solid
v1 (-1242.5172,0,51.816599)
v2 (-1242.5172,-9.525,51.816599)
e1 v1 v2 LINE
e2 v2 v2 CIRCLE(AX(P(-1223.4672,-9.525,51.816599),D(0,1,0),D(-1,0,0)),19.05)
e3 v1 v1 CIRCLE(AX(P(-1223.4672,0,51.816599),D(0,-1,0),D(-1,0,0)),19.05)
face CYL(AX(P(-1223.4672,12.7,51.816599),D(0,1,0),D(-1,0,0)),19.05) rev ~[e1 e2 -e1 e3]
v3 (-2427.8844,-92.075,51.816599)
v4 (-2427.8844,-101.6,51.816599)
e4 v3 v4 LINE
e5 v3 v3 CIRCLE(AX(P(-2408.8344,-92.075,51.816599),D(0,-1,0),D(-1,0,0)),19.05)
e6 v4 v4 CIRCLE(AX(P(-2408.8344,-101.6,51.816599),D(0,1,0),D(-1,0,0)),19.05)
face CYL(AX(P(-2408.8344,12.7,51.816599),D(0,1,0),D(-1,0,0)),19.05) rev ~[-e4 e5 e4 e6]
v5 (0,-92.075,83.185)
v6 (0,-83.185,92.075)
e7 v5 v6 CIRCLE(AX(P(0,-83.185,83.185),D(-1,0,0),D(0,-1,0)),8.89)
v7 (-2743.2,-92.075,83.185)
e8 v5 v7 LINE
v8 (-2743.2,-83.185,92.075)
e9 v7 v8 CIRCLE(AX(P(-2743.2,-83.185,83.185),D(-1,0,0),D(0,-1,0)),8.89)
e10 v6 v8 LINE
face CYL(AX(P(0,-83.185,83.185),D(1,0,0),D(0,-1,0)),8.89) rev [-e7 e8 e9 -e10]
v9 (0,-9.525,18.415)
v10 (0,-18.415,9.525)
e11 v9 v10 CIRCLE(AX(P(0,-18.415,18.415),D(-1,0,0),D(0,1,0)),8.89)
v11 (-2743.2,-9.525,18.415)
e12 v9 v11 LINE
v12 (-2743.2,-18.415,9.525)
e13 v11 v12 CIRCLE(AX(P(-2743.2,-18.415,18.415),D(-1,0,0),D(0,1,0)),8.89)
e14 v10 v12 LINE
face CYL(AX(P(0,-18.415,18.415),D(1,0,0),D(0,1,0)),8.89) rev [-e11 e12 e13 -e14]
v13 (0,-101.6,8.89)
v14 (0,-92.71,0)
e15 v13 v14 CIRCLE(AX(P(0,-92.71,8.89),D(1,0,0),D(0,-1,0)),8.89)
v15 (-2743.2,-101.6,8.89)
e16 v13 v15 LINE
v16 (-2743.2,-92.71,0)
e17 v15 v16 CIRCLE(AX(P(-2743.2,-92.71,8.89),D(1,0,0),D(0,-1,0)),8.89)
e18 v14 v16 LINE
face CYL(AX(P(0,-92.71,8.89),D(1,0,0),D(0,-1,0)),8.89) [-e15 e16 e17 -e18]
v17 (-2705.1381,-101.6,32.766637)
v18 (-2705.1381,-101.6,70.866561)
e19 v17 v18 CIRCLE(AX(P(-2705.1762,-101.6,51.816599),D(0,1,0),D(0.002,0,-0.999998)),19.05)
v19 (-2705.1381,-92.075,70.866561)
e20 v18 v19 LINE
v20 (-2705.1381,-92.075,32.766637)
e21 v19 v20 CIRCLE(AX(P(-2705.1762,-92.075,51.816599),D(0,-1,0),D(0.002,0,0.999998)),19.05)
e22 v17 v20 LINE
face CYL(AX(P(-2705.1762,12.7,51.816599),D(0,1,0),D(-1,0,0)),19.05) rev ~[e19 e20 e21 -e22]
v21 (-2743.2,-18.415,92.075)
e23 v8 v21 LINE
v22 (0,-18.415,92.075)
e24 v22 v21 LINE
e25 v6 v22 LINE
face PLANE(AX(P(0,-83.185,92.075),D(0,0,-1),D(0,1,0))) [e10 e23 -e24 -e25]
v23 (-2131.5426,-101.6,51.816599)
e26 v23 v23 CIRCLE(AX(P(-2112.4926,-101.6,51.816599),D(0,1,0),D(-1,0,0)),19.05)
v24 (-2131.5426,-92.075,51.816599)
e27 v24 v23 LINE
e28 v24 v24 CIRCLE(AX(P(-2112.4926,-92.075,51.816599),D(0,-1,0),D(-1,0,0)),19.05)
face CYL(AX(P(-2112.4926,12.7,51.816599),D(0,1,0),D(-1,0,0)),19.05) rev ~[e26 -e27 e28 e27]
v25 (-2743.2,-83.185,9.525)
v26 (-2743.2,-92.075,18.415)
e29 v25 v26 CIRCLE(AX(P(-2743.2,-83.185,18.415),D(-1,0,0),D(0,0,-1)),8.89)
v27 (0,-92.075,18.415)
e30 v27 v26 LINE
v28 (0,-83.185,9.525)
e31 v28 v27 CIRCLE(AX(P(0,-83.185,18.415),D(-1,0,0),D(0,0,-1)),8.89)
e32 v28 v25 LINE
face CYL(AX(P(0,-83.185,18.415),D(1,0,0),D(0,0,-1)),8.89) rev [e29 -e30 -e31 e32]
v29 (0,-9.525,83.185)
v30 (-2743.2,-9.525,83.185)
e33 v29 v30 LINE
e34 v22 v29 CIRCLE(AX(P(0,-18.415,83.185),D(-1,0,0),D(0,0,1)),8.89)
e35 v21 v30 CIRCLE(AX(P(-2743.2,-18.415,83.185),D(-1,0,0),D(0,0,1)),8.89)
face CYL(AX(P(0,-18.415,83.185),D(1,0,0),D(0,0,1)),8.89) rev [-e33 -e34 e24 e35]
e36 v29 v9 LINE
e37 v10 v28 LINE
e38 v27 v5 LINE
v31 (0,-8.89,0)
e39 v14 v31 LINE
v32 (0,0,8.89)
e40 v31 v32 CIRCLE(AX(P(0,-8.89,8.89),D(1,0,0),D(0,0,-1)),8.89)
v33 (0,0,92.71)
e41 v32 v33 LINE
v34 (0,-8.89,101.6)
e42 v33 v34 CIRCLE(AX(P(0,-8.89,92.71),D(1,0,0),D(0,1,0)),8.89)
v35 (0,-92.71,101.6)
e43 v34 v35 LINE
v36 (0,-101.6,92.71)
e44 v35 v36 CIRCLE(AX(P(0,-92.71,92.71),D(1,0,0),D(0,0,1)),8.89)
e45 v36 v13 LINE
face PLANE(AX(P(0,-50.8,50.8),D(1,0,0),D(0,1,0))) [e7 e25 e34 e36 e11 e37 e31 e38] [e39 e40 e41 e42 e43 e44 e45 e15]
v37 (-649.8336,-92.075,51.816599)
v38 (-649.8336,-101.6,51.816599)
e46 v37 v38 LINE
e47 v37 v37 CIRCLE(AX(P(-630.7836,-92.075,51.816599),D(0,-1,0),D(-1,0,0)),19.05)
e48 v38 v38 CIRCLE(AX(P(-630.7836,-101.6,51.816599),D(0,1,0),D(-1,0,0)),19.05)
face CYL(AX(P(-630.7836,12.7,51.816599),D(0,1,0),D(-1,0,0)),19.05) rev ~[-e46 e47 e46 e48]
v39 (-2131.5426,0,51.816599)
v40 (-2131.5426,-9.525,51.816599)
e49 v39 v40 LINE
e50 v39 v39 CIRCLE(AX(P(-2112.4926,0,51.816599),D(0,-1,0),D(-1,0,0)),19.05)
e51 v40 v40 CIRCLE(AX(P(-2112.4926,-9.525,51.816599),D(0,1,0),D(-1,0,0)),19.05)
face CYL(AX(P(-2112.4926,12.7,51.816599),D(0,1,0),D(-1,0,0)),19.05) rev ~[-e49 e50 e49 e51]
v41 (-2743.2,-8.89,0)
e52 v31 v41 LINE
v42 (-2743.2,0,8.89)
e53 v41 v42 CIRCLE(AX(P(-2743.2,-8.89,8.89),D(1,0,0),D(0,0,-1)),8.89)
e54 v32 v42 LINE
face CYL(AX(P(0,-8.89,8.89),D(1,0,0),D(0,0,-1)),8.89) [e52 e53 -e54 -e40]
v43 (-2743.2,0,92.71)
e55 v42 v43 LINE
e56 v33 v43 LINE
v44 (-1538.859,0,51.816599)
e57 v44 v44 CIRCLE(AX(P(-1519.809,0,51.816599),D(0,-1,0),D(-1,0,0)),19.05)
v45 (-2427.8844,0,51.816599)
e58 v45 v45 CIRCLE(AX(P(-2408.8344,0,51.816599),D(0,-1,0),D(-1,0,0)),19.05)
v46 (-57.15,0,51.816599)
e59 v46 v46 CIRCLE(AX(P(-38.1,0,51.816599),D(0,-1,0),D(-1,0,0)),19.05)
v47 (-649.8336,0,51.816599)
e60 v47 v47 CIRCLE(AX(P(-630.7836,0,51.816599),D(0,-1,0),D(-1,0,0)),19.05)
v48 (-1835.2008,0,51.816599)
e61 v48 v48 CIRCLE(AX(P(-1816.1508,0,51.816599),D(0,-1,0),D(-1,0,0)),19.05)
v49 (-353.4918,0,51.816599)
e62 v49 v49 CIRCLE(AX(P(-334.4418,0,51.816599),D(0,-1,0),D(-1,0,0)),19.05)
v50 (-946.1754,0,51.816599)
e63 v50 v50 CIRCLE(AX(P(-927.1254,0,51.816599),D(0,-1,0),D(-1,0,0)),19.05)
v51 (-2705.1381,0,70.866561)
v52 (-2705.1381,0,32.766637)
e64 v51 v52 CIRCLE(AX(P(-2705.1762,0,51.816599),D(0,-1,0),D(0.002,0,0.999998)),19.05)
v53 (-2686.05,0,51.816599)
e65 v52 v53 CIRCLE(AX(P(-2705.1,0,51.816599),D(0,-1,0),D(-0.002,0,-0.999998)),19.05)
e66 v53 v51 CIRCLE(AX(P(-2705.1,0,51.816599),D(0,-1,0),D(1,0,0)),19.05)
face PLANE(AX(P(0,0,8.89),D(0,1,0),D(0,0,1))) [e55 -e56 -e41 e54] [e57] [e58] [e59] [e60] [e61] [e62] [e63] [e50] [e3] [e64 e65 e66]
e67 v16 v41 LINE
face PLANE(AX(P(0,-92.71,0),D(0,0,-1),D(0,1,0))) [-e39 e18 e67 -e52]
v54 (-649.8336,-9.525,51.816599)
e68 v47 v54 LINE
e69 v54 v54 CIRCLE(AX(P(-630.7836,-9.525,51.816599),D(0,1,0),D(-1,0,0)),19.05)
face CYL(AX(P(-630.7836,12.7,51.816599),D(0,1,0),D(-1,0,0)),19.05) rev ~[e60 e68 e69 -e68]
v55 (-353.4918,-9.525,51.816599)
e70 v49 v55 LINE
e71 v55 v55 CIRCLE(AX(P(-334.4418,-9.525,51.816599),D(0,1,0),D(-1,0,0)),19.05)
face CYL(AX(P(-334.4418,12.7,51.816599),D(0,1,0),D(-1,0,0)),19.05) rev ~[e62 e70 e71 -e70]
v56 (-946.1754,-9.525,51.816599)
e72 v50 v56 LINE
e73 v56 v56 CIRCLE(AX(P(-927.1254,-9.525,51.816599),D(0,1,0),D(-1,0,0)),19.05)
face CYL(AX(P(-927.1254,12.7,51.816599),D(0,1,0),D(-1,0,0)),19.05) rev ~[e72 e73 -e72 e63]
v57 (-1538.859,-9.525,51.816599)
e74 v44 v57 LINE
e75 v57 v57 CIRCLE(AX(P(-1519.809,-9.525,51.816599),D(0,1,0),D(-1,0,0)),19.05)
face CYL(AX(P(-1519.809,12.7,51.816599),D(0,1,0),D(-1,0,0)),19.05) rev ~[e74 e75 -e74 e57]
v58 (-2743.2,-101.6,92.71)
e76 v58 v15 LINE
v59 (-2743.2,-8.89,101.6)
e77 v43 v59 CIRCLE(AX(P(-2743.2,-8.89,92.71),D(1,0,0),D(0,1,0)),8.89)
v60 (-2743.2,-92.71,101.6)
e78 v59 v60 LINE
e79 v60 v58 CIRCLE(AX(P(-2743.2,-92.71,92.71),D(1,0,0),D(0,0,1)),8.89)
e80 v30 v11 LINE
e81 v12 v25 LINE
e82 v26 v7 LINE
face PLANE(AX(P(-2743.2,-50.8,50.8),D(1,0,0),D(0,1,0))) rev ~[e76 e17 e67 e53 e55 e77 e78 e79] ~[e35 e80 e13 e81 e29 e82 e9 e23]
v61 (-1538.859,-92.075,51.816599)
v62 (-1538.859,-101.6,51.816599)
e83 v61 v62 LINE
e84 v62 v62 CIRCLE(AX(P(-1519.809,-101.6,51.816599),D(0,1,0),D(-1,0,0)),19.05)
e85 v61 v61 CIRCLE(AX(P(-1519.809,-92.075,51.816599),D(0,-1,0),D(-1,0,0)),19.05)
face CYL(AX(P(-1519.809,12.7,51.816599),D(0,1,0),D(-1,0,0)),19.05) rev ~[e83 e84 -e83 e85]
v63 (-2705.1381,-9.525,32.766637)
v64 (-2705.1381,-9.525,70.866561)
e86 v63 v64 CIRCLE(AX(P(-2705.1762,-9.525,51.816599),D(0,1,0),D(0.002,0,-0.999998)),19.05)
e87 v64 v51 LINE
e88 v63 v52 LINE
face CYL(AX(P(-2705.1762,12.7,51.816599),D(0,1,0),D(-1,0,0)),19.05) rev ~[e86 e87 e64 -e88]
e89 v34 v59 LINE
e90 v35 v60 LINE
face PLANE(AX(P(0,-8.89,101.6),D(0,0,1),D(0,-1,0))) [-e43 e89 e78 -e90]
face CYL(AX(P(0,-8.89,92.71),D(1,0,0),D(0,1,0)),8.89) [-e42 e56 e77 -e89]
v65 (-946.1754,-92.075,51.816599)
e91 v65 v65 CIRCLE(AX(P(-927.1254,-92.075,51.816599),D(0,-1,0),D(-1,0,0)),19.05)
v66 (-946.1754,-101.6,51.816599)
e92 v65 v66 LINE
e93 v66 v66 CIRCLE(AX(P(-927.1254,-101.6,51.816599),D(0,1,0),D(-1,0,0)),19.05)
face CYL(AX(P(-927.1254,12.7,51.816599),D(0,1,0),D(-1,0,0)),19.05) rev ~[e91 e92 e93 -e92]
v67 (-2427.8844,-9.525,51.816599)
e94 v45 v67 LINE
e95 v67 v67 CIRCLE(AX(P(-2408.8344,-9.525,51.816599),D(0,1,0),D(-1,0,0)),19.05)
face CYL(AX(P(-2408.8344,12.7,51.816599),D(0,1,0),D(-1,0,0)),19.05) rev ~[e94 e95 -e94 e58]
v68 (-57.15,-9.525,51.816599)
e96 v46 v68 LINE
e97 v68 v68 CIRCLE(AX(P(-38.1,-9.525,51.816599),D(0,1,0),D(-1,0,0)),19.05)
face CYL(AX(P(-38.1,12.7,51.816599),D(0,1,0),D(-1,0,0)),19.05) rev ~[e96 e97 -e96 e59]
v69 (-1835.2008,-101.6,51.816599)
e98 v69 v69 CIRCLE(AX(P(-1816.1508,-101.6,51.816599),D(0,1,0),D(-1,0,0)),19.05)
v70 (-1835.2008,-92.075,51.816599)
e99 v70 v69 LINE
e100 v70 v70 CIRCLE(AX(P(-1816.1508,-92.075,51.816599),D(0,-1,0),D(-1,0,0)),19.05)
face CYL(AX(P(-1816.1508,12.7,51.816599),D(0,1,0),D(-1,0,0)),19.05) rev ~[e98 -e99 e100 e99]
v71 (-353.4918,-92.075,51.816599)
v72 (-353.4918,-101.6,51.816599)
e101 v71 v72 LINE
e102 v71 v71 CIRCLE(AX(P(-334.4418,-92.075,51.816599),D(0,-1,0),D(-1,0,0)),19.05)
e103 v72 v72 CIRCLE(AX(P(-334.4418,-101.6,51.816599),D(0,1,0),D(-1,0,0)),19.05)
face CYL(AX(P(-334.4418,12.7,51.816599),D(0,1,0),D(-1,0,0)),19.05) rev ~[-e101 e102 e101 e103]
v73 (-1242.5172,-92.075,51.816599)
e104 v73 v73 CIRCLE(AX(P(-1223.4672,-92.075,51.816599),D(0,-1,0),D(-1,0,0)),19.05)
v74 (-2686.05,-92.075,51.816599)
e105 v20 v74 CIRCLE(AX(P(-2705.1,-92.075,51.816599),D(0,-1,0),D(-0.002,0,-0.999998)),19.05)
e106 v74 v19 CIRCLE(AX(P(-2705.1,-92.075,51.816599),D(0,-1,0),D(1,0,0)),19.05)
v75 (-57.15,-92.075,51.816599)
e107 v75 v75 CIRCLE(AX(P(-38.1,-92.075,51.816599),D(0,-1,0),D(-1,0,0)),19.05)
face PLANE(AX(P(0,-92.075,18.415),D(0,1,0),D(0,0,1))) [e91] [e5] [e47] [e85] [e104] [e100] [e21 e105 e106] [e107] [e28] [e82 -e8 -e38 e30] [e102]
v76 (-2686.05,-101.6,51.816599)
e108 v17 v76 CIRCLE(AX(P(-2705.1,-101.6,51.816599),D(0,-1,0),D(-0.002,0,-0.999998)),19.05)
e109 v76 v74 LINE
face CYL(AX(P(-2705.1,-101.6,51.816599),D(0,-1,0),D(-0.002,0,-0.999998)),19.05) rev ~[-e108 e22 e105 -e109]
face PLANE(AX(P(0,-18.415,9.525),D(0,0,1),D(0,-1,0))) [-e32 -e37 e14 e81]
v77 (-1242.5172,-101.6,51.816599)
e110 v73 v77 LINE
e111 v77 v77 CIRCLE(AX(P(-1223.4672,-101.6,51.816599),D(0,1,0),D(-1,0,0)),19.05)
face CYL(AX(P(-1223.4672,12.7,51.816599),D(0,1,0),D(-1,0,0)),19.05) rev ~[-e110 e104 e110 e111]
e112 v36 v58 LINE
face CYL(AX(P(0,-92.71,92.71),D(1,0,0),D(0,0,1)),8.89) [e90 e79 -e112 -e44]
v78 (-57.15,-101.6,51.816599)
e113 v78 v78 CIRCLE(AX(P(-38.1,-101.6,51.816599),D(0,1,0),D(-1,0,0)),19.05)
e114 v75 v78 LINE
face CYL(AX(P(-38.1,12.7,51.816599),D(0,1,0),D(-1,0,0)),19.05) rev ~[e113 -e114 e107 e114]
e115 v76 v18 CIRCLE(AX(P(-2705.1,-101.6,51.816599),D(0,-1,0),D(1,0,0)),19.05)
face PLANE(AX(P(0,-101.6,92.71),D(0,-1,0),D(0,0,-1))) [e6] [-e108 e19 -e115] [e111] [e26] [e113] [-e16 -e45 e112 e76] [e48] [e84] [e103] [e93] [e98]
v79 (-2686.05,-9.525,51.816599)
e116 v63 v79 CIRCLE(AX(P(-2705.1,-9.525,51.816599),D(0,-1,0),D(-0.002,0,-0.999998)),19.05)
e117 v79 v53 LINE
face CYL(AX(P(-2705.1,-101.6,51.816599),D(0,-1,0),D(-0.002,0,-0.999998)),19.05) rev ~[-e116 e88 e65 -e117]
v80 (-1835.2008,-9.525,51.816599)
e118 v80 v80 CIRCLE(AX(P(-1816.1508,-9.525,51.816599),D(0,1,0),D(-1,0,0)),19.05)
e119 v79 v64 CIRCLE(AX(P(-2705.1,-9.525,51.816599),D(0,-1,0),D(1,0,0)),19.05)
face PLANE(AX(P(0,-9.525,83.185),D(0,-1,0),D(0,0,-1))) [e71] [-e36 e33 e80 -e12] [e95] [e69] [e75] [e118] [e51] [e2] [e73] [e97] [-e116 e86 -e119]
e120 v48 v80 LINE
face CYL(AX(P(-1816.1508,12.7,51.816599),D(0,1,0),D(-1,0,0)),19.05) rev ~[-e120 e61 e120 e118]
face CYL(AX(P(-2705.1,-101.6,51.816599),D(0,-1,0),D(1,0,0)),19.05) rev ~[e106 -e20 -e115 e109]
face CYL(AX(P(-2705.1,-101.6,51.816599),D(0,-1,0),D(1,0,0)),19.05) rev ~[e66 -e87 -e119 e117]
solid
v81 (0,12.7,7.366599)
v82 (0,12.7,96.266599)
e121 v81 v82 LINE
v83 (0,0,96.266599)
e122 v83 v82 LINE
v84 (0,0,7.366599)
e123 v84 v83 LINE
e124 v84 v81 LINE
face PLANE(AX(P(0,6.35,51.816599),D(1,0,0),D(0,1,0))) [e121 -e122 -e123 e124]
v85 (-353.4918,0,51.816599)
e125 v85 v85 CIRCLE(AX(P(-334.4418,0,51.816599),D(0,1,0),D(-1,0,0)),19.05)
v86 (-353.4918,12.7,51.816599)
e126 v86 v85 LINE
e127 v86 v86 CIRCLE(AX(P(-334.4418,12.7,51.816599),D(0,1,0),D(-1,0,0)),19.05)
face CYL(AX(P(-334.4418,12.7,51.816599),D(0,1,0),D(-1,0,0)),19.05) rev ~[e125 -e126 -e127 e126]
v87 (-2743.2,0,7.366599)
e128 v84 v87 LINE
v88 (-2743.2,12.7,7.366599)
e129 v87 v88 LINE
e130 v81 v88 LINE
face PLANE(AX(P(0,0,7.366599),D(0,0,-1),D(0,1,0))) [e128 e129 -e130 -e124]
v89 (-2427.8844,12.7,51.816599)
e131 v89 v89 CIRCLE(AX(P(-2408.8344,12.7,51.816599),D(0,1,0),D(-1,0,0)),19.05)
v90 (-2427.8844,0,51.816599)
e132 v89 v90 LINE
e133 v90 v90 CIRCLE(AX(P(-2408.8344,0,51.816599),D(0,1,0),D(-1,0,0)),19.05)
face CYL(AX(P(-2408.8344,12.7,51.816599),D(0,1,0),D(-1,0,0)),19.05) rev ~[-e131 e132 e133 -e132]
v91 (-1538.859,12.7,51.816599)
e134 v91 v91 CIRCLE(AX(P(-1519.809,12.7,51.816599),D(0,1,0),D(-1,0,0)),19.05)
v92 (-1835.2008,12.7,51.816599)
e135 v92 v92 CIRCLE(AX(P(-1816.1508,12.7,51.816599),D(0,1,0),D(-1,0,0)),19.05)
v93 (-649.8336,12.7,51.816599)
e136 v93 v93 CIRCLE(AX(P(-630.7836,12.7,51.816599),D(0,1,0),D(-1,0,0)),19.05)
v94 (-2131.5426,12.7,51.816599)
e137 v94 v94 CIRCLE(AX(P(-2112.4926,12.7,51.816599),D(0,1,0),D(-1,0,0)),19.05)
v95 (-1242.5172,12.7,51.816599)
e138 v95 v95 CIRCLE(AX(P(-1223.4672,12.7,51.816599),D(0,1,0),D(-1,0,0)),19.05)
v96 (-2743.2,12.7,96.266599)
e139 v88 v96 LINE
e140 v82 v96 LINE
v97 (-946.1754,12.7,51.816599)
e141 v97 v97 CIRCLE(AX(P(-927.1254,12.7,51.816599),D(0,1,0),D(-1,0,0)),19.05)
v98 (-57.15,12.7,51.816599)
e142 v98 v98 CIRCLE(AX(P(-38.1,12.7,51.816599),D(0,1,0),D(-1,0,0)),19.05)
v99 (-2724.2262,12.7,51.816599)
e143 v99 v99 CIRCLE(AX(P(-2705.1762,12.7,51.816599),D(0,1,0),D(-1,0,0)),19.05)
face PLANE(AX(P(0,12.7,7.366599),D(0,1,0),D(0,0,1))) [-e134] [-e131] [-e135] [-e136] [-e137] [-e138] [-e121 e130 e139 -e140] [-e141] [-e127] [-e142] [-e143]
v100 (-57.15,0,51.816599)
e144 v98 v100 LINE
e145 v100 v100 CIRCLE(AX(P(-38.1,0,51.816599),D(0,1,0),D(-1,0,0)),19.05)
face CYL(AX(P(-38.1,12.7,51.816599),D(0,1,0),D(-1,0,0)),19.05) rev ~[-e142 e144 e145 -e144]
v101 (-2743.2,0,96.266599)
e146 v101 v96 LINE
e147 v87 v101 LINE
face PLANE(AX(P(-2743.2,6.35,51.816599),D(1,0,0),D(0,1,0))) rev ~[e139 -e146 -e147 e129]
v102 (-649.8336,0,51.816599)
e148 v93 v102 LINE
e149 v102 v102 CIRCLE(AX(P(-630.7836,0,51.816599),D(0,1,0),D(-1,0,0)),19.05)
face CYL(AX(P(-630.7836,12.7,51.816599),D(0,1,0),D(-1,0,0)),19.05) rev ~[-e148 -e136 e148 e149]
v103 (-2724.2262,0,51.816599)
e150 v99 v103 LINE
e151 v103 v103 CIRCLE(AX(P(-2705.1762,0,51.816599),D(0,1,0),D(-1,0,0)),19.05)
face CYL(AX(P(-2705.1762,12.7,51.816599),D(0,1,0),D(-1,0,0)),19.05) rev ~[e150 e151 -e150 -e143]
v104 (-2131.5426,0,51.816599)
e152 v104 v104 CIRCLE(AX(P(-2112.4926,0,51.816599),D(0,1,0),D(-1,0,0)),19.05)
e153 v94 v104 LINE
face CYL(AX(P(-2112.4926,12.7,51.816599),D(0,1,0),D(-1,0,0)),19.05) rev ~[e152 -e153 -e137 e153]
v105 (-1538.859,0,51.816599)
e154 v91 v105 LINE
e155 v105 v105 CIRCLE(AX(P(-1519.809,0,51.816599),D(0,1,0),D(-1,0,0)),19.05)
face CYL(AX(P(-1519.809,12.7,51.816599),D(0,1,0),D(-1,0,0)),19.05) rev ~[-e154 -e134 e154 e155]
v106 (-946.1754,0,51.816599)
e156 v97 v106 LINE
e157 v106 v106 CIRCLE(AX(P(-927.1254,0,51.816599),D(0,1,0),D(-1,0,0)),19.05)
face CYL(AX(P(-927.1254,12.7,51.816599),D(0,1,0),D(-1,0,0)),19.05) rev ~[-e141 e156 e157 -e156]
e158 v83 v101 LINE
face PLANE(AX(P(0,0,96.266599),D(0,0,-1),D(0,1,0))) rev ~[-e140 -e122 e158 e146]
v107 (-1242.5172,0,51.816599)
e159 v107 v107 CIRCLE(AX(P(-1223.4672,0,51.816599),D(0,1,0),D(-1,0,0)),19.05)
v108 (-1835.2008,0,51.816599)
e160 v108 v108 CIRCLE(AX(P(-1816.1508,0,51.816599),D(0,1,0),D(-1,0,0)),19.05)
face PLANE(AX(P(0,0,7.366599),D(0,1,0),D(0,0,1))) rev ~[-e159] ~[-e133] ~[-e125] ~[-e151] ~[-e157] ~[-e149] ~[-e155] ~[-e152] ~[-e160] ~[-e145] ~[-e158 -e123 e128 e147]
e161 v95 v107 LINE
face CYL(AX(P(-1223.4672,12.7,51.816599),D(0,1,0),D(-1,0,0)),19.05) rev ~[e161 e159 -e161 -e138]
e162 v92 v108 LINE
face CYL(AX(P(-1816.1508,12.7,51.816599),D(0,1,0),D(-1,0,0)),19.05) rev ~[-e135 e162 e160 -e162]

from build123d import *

# Parameters (mm, degrees)
F1_DEPTH = 2743.2
F2_W     = 12.7
F2_H     = 88.9
F3_DEPTH = 2743.2
F4_R     = 19.05
F5_DEPTH = 114.301
F6_R     = 19.05
F7_DEPTH = 254


# Not quite as in the source:
# - a feature names something its author has since deleted; it is built from what else it names


with BuildPart() as f1:
    # F0 (on Right) → F1 (new body)
    with BuildSketch(Plane.YZ):
        with BuildLine():
            Line((-92.71, 0), (-8.89, 0))
            ThreePointArc((-8.89, 0), (-2.6038207153, 2.6038207153), (0, 8.89))
            Line((0, 8.89), (0, 92.71))
            ThreePointArc((0, 92.71), (-2.6038207153, 98.9961792847), (-8.89, 101.6))
            Line((-8.89, 101.6), (-92.71, 101.6))
            ThreePointArc((-92.71, 101.6), (-98.9961792847, 98.9961792847), (-101.6, 92.71))
            Line((-101.6, 92.71), (-101.6, 8.89))
            ThreePointArc((-101.6, 8.89), (-98.9961792847, 2.6038207153), (-92.71, 0))
        make_face()
        with BuildLine():
            Line((-83.185, 92.075), (-18.415, 92.075))
            ThreePointArc((-18.415, 92.075), (-12.1288207153, 89.4711792847), (-9.525, 83.185))
            Line((-9.525, 83.185), (-9.525, 18.415))
            ThreePointArc((-9.525, 18.415), (-12.1288207153, 12.1288207153), (-18.415, 9.525))
            Line((-18.415, 9.525), (-83.185, 9.525))
            ThreePointArc((-83.185, 9.525), (-89.4711792847, 12.1288207153), (-92.075, 18.415))
            Line((-92.075, 18.415), (-92.075, 83.185))
            ThreePointArc((-92.075, 83.185), (-89.4711792847, 89.4711792847), (-83.185, 92.075))
        make_face(mode=Mode.SUBTRACT)
    extrude(amount=-F1_DEPTH)


with BuildPart() as f3:
    # F2 (on Right) → F3 (new body)
    with BuildSketch(Plane.YZ):
        with Locations((6.35, 51.8165992945)):
            Rectangle(F2_W, F2_H)
    extrude(amount=-F3_DEPTH)


with BuildPart() as f5_tool:
    # F4 (on face) → F5 (new body, through all)
    with BuildSketch(Plane(origin=(0, 12.7, 0), x_dir=(-1, 0, 0), z_dir=(0, 1, 0))):
        with Locations((38.1, 51.8165992945)):
            Circle(F4_R)
        with Locations((334.4418, 51.8165992945)):
            Circle(F4_R)
        with Locations((630.7836, 51.8165992945)):
            Circle(F4_R)
        with Locations((927.1254, 51.8165992945)):
            Circle(F4_R)
        with Locations((1223.4672, 51.8165992945)):
            Circle(F4_R)
        with Locations((1519.809, 51.8165992945)):
            Circle(F4_R)
        with Locations((1816.1508, 51.8165992945)):
            Circle(F4_R)
        with Locations((2112.4926, 51.8165992945)):
            Circle(F4_R)
        with Locations((2408.8344, 51.8165992945)):
            Circle(F4_R)
        with Locations((2705.1762, 51.8165992945)):
            Circle(F4_R)
    extrude(amount=-F5_DEPTH)


with BuildPart() as f1_1:
    add(f1.part)

    # F5: cut by f5_tool
    add(f5_tool.part, mode=Mode.SUBTRACT)

    # F6 (on face) → F7 (cut)
    with BuildSketch(Plane.XZ.offset(101.6)):
        with Locations((-38.1, 51.8165992945)):
            Circle(F6_R)
        with Locations((-334.4418, 51.8165992945)):
            Circle(F6_R)
        with Locations((-630.7836, 51.8165992945)):
            Circle(F6_R)
        with Locations((-927.1254, 51.8165992945)):
            Circle(F6_R)
        with Locations((-1223.4672, 51.8165992945)):
            Circle(F6_R)
        with Locations((-1519.809, 51.8165992945)):
            Circle(F6_R)
        with Locations((-1816.1508, 51.8165992945)):
            Circle(F6_R)
        with Locations((-2112.4926, 51.8165992945)):
            Circle(F6_R)
        with Locations((-2408.8344, 51.8165992945)):
            Circle(F6_R)
        with BuildLine():
            ThreePointArc((-2705.1381000001, 32.7666373946), (-2691.6923521627, 38.359692239), (-2686.1262, 51.8165992945))
            ThreePointArc((-2686.1262, 51.8165992945), (-2691.6923521626, 65.27350635), (-2705.1380999999, 70.8665611945))
            ThreePointArc((-2705.1380999999, 70.8665611945), (-2724.15, 51.8165992947), (-2705.1381000001, 32.7666373946))
        make_face()
        with BuildLine():
            ThreePointArc((-2705.1380999999, 70.8665611945), (-2691.6923521626, 65.27350635), (-2686.1262, 51.8165992945))
            ThreePointArc((-2686.1262, 51.8165992945), (-2691.6923521627, 38.359692239), (-2705.1381000001, 32.7666373946))
            ThreePointArc((-2705.1381000001, 32.7666373946), (-2691.6430929446, 38.3327514572), (-2686.05, 51.8165992945))
            ThreePointArc((-2686.05, 51.8165992945), (-2691.6430929445, 65.3004471318), (-2705.1380999999, 70.8665611945))
        make_face()
        with BuildLine():
            ThreePointArc((-2705.1381000001, 32.7666373946), (-2724.15, 51.8165992947), (-2705.1380999999, 70.8665611945))
            ThreePointArc((-2705.1380999999, 70.8665611945), (-2724.2262, 51.8165992947), (-2705.1381000001, 32.7666373946))
        make_face()
    extrude(amount=-F7_DEPTH, mode=Mode.SUBTRACT)


with BuildPart() as f3_1:
    add(f3.part)

    # F5: cut by f5_tool
    add(f5_tool.part, mode=Mode.SUBTRACT)


solid = Compound([f1_1.part, f3_1.part])
